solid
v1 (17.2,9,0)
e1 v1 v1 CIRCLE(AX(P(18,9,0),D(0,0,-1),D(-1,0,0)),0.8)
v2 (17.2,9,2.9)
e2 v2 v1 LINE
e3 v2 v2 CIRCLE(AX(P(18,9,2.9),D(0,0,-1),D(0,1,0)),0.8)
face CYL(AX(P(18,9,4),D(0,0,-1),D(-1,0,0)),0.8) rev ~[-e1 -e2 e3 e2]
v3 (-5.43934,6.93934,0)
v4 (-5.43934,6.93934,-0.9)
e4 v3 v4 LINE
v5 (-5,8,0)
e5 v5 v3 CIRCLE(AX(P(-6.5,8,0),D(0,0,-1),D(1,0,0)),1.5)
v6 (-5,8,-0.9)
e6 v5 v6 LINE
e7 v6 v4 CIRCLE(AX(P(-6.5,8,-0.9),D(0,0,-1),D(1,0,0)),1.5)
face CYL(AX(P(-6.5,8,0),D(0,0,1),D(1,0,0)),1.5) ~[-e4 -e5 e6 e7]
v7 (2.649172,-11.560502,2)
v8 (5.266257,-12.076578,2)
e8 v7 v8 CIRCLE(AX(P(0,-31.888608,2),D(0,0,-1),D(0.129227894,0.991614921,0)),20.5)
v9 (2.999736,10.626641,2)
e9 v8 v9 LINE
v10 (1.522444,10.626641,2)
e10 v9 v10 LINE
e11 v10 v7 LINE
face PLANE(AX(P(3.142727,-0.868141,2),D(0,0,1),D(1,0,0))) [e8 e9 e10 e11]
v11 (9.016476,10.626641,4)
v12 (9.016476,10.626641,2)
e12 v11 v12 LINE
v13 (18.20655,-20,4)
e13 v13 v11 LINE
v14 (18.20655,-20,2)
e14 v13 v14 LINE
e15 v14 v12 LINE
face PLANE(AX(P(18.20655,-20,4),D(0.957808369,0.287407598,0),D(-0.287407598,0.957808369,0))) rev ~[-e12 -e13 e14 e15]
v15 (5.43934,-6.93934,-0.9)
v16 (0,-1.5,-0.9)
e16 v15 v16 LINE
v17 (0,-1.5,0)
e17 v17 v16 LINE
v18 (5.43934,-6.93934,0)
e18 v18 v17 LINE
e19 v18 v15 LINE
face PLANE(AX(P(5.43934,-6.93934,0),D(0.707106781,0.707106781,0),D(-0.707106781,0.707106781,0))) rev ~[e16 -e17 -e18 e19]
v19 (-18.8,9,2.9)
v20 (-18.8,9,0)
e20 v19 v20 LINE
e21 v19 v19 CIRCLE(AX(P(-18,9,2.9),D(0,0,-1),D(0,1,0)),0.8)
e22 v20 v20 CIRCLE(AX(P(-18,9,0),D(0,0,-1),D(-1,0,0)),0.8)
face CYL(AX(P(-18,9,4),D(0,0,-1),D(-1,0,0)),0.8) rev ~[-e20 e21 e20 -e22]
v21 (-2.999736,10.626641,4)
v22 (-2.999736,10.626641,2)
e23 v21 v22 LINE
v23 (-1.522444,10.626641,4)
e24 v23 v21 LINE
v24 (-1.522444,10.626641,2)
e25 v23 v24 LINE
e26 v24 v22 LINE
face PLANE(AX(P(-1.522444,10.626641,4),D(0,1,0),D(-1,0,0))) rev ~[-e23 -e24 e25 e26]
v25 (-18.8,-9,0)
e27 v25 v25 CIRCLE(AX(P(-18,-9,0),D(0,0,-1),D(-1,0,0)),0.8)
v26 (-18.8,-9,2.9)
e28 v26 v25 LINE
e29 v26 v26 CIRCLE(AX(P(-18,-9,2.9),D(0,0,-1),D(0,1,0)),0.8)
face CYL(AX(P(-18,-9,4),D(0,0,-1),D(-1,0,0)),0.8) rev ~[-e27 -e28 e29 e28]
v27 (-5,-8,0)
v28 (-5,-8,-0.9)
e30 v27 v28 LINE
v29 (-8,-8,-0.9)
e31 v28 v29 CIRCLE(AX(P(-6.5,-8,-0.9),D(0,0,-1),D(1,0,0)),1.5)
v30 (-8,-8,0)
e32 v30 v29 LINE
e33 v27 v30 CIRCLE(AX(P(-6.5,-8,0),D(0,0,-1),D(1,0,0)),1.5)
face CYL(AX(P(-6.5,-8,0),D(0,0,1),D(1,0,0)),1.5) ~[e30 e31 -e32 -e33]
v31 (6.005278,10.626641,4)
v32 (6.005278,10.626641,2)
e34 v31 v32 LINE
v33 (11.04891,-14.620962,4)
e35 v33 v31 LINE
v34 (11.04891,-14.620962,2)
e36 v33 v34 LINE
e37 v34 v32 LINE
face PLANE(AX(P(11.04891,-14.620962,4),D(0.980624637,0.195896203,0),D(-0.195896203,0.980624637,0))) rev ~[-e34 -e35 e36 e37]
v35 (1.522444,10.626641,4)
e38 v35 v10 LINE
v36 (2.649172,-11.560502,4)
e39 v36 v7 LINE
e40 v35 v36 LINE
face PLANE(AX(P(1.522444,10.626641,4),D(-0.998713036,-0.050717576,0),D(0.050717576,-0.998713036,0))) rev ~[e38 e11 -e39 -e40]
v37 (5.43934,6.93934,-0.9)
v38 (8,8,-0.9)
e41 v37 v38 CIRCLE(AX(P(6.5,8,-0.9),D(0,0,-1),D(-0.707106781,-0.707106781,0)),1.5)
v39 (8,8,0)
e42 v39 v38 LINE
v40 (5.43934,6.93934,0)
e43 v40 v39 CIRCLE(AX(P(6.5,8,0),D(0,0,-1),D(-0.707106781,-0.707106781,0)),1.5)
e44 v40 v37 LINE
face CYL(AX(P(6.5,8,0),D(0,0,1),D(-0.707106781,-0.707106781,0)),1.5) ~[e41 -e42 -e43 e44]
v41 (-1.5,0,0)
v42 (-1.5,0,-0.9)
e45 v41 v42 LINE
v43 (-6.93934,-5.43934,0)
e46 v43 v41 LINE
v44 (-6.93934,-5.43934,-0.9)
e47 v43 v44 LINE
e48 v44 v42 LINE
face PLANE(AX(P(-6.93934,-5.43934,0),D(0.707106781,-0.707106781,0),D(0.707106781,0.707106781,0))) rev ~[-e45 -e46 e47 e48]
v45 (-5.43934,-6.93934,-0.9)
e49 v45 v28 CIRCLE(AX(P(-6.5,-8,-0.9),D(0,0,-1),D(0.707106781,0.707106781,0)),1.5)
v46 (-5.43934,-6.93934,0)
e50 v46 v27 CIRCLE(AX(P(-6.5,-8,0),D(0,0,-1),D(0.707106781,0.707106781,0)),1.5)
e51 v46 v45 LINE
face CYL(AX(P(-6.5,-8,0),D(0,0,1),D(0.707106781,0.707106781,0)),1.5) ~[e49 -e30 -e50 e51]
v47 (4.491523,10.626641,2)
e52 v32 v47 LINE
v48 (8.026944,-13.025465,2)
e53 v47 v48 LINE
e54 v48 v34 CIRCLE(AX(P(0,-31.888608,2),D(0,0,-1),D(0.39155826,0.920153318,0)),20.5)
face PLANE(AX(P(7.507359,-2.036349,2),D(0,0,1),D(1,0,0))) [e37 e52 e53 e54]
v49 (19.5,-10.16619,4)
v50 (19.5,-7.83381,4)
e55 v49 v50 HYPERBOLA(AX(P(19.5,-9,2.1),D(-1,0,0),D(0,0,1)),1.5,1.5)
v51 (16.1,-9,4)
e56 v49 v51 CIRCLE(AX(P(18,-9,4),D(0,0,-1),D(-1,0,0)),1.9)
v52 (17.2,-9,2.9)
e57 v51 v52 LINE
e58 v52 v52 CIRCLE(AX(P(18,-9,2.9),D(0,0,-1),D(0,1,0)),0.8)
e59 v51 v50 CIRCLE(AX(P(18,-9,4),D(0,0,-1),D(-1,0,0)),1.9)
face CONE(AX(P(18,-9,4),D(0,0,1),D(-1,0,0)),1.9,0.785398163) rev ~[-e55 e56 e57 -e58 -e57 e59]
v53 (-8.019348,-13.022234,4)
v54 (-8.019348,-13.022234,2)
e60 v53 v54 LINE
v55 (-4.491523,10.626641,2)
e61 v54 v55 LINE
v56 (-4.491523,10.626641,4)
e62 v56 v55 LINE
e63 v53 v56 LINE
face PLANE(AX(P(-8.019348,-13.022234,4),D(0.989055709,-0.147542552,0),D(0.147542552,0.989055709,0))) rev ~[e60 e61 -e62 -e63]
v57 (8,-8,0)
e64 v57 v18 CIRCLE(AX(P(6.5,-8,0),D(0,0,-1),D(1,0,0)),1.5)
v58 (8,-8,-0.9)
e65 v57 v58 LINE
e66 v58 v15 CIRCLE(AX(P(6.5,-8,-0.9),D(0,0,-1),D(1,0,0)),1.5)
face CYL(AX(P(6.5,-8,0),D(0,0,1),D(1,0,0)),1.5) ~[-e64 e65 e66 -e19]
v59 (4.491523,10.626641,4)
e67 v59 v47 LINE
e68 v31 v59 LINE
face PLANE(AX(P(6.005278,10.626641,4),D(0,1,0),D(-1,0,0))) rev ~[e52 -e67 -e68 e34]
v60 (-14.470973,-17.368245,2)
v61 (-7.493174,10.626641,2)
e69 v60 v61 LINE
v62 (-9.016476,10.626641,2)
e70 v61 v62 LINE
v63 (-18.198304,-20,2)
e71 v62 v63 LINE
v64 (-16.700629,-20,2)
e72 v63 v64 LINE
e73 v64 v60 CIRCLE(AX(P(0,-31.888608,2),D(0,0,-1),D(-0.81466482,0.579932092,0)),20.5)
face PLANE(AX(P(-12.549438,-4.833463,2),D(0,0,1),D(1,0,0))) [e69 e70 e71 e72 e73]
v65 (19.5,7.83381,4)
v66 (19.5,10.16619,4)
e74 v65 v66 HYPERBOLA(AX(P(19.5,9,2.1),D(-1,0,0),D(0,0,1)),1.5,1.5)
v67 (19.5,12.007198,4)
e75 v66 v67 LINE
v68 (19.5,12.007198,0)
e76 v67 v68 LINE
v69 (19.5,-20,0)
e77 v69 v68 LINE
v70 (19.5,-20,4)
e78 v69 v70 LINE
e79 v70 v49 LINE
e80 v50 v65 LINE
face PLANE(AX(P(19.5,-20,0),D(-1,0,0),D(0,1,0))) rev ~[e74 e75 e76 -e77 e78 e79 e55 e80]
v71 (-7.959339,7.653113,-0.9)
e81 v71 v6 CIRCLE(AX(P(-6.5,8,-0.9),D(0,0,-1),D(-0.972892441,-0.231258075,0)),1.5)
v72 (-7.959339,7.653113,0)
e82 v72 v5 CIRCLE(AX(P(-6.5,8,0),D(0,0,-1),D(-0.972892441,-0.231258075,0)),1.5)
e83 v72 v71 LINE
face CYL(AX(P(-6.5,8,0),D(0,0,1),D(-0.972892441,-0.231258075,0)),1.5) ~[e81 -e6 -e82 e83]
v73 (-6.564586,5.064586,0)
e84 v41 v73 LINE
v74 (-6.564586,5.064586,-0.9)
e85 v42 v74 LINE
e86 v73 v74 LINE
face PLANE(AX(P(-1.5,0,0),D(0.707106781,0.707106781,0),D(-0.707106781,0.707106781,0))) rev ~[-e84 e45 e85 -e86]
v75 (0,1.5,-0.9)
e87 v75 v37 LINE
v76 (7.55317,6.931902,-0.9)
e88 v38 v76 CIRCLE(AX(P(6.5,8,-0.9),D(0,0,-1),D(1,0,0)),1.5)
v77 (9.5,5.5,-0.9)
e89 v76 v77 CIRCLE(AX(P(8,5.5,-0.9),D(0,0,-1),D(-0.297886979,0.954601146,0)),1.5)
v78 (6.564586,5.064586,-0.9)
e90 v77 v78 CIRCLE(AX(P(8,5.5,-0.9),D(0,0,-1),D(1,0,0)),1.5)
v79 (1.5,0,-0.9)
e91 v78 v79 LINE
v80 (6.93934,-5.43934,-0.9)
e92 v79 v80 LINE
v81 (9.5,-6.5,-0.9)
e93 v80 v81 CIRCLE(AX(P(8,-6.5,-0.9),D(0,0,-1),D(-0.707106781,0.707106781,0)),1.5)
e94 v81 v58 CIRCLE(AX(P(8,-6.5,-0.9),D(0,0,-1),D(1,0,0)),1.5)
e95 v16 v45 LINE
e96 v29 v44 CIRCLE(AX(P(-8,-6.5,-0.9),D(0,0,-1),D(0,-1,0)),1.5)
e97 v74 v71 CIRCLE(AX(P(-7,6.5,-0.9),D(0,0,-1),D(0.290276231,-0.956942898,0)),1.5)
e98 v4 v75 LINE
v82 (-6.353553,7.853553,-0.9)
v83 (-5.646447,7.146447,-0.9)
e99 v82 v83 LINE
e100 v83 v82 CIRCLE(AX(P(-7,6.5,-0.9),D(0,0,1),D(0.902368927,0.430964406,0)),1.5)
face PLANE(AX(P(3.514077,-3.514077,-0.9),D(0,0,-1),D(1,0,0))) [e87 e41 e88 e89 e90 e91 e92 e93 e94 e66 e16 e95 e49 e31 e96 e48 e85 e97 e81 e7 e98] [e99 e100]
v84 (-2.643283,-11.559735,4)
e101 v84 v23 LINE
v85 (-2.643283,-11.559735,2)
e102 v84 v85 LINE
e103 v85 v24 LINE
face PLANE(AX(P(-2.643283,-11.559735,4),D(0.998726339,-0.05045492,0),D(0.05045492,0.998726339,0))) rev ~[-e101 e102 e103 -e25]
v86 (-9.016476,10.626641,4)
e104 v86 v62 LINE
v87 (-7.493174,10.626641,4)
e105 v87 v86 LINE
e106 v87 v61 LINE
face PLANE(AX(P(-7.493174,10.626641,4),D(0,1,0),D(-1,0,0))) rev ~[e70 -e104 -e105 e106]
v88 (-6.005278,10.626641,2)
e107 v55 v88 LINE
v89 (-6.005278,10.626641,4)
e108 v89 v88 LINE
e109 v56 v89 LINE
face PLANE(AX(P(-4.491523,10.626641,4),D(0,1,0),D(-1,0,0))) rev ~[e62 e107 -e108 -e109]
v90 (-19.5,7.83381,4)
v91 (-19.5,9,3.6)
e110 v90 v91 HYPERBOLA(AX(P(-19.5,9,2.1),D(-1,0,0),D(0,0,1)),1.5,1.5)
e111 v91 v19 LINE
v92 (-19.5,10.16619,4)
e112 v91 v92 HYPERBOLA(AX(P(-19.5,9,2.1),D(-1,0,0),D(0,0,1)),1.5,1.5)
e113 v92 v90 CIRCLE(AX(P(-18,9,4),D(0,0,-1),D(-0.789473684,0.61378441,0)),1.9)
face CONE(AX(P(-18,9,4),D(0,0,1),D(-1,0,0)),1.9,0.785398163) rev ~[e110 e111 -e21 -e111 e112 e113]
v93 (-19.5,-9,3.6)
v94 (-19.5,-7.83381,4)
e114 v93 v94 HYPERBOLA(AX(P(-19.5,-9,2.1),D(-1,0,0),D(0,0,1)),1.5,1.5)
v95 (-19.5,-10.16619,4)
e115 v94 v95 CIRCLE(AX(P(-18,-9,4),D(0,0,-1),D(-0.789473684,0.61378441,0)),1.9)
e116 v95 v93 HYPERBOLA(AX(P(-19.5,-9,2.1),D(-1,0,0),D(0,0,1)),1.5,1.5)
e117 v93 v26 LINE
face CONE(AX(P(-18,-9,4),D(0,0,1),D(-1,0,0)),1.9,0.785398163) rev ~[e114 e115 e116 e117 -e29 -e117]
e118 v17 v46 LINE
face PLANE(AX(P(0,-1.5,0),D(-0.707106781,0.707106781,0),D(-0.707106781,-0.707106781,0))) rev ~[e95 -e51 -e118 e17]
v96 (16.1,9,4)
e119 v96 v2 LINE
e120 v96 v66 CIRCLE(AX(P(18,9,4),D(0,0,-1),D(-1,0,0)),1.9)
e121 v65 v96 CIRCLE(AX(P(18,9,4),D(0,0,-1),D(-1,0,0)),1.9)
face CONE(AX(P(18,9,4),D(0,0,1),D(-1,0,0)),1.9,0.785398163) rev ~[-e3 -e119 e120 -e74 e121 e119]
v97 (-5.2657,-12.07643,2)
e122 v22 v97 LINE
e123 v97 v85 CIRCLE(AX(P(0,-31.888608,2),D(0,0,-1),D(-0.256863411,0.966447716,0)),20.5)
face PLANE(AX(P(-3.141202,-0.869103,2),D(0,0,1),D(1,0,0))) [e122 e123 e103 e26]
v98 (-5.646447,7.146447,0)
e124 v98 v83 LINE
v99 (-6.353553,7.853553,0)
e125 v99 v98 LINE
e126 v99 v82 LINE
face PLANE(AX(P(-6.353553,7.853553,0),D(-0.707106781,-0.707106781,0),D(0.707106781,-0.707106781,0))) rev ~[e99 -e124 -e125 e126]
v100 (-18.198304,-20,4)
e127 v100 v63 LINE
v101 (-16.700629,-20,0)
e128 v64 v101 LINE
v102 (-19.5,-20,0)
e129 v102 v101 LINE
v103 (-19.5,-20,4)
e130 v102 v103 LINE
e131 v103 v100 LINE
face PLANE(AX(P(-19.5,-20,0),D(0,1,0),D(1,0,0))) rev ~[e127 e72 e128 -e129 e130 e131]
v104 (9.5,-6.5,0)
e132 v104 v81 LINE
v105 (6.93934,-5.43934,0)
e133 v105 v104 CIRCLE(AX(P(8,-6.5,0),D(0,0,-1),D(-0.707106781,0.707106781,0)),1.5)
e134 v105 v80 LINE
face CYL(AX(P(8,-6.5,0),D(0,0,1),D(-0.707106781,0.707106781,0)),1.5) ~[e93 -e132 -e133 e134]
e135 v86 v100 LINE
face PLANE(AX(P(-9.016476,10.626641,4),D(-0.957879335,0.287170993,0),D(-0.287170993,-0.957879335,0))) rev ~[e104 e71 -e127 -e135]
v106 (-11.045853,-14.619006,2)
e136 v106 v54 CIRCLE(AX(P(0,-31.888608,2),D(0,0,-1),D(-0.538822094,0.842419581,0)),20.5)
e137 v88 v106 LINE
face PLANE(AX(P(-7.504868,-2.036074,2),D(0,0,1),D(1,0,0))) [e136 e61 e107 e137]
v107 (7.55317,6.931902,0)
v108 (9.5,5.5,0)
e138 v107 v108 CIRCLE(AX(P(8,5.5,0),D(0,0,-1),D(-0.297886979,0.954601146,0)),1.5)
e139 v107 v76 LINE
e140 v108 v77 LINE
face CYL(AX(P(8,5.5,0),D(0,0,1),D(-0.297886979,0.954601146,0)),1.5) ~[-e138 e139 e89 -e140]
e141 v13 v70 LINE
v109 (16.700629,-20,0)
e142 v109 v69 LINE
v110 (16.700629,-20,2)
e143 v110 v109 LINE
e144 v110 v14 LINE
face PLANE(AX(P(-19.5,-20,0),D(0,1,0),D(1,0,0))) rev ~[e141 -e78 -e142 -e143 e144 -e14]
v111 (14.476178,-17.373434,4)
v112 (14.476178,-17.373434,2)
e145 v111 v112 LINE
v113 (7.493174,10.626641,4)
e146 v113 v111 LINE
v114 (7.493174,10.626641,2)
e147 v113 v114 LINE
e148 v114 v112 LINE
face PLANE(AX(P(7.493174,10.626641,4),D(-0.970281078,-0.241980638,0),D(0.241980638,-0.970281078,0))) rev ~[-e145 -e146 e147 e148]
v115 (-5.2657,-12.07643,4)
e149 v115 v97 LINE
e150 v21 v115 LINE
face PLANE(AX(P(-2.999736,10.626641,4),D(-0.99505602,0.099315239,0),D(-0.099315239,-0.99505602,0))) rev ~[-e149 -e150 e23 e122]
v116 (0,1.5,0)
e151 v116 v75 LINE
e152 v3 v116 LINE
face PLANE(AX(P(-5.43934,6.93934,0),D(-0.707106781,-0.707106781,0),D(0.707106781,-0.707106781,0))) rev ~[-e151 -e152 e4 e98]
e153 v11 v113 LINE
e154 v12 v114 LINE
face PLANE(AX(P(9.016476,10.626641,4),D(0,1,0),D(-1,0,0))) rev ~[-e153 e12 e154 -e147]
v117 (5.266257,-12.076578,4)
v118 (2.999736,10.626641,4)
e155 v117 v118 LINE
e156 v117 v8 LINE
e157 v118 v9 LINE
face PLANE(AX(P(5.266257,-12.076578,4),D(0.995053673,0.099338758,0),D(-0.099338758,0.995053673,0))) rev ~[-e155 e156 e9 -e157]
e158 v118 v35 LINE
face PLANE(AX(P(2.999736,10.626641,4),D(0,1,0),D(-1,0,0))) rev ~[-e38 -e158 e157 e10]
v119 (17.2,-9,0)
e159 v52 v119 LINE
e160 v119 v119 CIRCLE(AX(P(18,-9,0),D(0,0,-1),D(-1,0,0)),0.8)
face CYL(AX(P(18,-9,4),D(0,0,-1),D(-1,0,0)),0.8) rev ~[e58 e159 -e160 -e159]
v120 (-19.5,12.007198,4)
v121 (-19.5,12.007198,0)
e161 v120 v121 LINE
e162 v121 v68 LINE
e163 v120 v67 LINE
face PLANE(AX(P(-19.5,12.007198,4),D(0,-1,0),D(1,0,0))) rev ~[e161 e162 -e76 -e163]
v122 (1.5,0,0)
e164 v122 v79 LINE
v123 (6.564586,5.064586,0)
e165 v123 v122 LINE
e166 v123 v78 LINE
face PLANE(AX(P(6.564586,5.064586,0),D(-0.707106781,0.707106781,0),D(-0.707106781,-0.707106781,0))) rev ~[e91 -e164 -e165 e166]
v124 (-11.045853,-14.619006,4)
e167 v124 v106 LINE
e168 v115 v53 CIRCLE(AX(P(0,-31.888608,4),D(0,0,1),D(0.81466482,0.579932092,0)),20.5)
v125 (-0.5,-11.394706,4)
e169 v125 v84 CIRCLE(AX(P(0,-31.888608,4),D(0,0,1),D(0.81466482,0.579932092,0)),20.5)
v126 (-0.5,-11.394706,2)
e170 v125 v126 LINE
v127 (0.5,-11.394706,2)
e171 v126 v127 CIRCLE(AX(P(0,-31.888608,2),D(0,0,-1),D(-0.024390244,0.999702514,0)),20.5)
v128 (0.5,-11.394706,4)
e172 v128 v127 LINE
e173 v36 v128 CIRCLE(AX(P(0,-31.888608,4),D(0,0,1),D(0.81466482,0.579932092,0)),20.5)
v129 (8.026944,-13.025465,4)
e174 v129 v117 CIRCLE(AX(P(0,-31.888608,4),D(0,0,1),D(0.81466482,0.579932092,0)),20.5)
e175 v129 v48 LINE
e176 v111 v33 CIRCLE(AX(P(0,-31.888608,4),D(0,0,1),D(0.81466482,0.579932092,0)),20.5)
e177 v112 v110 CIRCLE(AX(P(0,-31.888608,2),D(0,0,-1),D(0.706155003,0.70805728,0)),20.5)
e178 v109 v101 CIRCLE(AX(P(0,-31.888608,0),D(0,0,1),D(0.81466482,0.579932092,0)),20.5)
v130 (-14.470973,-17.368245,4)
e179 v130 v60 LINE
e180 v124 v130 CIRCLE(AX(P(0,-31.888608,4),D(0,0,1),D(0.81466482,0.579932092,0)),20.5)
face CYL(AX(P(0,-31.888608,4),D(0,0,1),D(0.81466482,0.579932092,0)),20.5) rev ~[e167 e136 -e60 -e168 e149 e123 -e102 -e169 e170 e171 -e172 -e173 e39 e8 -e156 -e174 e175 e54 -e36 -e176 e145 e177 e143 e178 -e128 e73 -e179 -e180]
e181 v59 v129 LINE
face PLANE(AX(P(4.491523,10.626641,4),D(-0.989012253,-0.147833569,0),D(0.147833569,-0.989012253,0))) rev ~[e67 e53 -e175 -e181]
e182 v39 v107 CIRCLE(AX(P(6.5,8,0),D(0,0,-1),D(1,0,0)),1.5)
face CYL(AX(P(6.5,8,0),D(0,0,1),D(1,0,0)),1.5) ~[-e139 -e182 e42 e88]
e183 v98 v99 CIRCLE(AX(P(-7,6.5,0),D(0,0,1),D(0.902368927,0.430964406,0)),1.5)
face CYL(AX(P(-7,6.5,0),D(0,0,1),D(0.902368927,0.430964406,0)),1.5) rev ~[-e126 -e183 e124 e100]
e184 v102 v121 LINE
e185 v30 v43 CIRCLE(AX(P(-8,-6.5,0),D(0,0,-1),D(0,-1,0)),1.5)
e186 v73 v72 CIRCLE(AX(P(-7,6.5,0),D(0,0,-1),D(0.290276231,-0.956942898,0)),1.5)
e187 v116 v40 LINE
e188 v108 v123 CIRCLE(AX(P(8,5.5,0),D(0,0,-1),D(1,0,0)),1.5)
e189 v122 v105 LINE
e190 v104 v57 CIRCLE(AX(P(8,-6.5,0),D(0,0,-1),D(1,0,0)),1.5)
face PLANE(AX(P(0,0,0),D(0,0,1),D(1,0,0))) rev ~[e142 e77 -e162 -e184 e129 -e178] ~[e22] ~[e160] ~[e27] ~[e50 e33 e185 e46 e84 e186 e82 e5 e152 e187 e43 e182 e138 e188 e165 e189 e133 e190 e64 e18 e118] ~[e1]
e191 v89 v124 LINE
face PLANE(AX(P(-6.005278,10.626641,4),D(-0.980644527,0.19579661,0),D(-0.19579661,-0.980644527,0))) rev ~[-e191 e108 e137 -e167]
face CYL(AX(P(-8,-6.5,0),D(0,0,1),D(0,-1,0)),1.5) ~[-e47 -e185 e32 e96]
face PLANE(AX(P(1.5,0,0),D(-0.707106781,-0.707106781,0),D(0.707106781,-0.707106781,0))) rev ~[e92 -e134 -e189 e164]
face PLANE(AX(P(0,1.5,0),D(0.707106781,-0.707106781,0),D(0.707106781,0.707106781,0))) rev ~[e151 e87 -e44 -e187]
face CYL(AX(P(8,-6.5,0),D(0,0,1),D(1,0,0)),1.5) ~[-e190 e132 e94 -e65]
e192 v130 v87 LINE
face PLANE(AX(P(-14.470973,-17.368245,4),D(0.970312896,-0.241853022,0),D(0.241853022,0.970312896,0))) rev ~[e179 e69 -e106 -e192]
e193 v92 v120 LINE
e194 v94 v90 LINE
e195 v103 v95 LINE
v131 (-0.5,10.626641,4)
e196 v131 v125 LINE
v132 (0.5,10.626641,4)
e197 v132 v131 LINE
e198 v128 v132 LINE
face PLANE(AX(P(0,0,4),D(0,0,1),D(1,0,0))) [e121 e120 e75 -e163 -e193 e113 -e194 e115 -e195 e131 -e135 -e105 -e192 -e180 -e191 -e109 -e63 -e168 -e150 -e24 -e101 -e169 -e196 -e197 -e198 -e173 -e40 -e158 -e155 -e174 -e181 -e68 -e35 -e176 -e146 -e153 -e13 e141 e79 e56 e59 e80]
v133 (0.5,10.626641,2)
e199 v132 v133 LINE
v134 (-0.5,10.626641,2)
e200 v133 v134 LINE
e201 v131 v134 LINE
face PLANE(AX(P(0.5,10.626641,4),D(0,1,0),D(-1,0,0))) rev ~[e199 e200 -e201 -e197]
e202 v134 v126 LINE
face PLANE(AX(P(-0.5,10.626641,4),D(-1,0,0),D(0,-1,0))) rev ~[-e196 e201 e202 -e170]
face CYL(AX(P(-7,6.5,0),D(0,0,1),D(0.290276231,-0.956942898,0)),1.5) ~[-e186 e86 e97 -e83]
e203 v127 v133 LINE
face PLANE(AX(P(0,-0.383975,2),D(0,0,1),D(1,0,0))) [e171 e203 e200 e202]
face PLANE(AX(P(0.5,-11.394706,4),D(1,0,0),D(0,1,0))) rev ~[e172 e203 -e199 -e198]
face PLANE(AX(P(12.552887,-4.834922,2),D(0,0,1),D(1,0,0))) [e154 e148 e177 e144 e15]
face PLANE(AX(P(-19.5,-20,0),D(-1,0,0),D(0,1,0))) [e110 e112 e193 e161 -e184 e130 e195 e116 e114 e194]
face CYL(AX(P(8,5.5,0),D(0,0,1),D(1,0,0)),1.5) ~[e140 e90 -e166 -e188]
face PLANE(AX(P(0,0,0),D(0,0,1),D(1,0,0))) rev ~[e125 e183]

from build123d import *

# Parameters (mm, degrees)
F0_W           = 39
F0_H           = 40
F1_DEPTH       = 4
F4_DEPTH       = 25
F5_W           = 39
F5_H           = 7.9928017035
F6_DEPTH       = 25
F9_D           = 1.6
F9_CSINK_D     = 3.8
F9_CSINK_ANGLE = 90
F10_DEPTH      = 2
F12_DEPTH      = 0.9
F13_DEPTH      = 2


with BuildPart() as f1:
    # F0 (on Top) → F1 (new body)
    with BuildSketch(Plane.XY):
        Rectangle(F0_W, F0_H)
    extrude(amount=F1_DEPTH)

    # F3 (on face) → F4 (cut)
    with BuildSketch(Plane.XY.offset(4)):
        with BuildLine():
            Line((-16.7006288041, -20), (16.7006288041, -20))
            ThreePointArc((16.7006288041, -20), (0, -11.3886078894), (-16.7006288041, -20))
        make_face()
        with BuildLine():
            ThreePointArc((-16.7006288041, -20), (-6.2404771258, -51.4156774402), (20.5, -31.8886078894))
            ThreePointArc((20.5, -31.8886078894), (19.5270695508, -25.6481307636), (16.7006288041, -20))
            Line((16.7006288041, -20), (-16.7006288041, -20))
        make_face()
    extrude(amount=-F4_DEPTH, mode=Mode.SUBTRACT)

    # F5 (on face) → F6 (cut)
    with BuildSketch(Plane.XY.offset(4)):
        with Locations((0, 16.0035991482)):
            Rectangle(F5_W, F5_H)
    extrude(amount=-F6_DEPTH, mode=Mode.SUBTRACT)

    # F9 (through all)
    with Locations(Plane.XY.offset(4)):
        with Locations((18, 9), (18, -9), (-18, 9), (-18, -9)):
            CounterSinkHole(F9_D / 2, F9_CSINK_D / 2, counter_sink_angle=F9_CSINK_ANGLE)

    # F7 (on face) → F10 (cut)
    with BuildSketch(Plane.XY.offset(4)):
        with BuildLine():
            Line((0.5, 10.6266411021), (-0.5, 10.6266411021))
            Line((-0.5, 10.6266411021), (-0.5, -11.3947063575))
            ThreePointArc((-0.5, -11.3947063575), (0, -11.3886078894), (0.5, -11.3947063575))
            Line((0.5, -11.3947063575), (0.5, 10.6266411021))
        make_face()
        with BuildLine():
            ThreePointArc((-5.2656999319, -12.0764297096), (-3.9629214288, -11.7752975267), (-2.6432830651, -11.5597354505))
            Line((-2.6432830651, -11.5597354505), (-1.522443646, 10.6266411021))
            Line((-1.522443646, 10.6266411021), (-2.021334134, 10.6266411021))
            Line((-2.021334134, 10.6266411021), (-2.4928057101, 10.6266411021))
            Line((-2.4928057101, 10.6266411021), (-2.9997361505, 10.6266411021))
            Line((-2.9997361505, 10.6266411021), (-5.2656999319, -12.0764297096))
        make_face()
        with BuildLine():
            ThreePointArc((-11.0458529252, -14.6190064709), (-9.5659756043, -13.7573610835), (-8.0193476987, -13.0222340331))
            Line((-8.0193476987, -13.0222340331), (-4.491522759, 10.6266411021))
            Line((-4.491522759, 10.6266411021), (-4.9930326641, 10.6266411021))
            Line((-4.9930326641, 10.6266411021), (-5.5073648691, 10.6266411021))
            Line((-5.5073648691, 10.6266411021), (-6.005277995, 10.6266411021))
            Line((-6.005277995, 10.6266411021), (-11.0458529252, -14.6190064709))
        make_face()
        with BuildLine():
            ThreePointArc((-16.7006288041, -20), (-15.6412505167, -18.6371444882), (-14.4709725994, -17.3682445321))
            Line((-14.4709725994, -17.3682445321), (-7.4931742786, 10.6266411021))
            Line((-7.4931742786, 10.6266411021), (-7.993305102, 10.6266411021))
            Line((-7.993305102, 10.6266411021), (-8.507637307, 10.6266411021))
            Line((-8.507637307, 10.6266411021), (-9.0164762619, 10.6266411021))
            Line((-9.0164762619, 10.6266411021), (-18.1983038783, -20))
            Line((-18.1983038783, -20), (-17.6982320845, -20))
            Line((-17.6982320845, -20), (-16.7006288041, -20))
        make_face()
    extrude(amount=-F10_DEPTH, mode=Mode.SUBTRACT)

    # F11 (on face) → F12 (join)
    with BuildSketch(Plane(origin=(0, 0, 0), x_dir=(1, 0, 0), z_dir=(0, 0, -1))):
        with BuildLine():
            Line((1.5, 0), (6.9393398282, 5.4393398282))
            ThreePointArc((6.9393398282, 5.4393398282), (6.6141807012, 5.9259748515), (6.5, 6.5))
            ThreePointArc((6.5, 6.5), (5.9259748515, 6.6141807012), (5.4393398282, 6.9393398282))
            Line((5.4393398282, 6.9393398282), (0, 1.5))
            Line((0, 1.5), (1.5, 0))
        make_face()
        with BuildLine():
            ThreePointArc((6.5, 6.5), (6.6141807012, 5.9259748515), (6.9393398282, 5.4393398282))
            ThreePointArc((6.9393398282, 5.4393398282), (8.5740251485, 5.1141807012), (9.5, 6.5))
            ThreePointArc((9.5, 6.5), (9.0606601718, 7.5606601718), (8, 8))
            ThreePointArc((8, 8), (7.5606601718, 6.9393398282), (6.5, 6.5))
        make_face()
        with BuildLine():
            Line((6.5645856533, -5.0645856533), (1.5, 0))
            Line((1.5, 0), (0, -1.5))
            Line((0, -1.5), (5.4393398282, -6.9393398282))
            ThreePointArc((5.4393398282, -6.9393398282), (6.1413193654, -6.5435151211), (6.9468304687, -6.5680982812))
            ThreePointArc((6.9468304687, -6.5680982812), (6.5462462433, -5.8695943925), (6.5645856533, -5.0645856533))
        make_face()
        Polygon((0, -1.5), (1.5, 0), (0, 1.5), (-1.5, 0), align=None)
        with BuildLine():
            ThreePointArc((5.4393398282, 6.9393398282), (5.9259748515, 6.6141807012), (6.5, 6.5))
            ThreePointArc((6.5, 6.5), (6.9393398282, 7.5606601718), (8, 8))
            ThreePointArc((8, 8), (5.9259748515, 9.3858192988), (5.4393398282, 6.9393398282))
        make_face()
        with BuildLine():
            ThreePointArc((8, 8), (6.9393398282, 7.5606601718), (6.5, 6.5))
            ThreePointArc((6.5, 6.5), (7.5606601718, 6.9393398282), (8, 8))
        make_face()
        with BuildLine():
            Line((-5.4393398282, -6.9393398282), (0, -1.5))
            Line((0, -1.5), (-1.5, 0))
            Line((-1.5, 0), (-6.5645856533, -5.0645856533))
            ThreePointArc((-6.5645856533, -5.0645856533), (-5.7951926461, -5.6064457263), (-5.5, -6.5))
            ThreePointArc((-5.5, -6.5), (-5.5102000145, -6.6746310491), (-5.5406613378, -6.8468871126))
            ThreePointArc((-5.5406613378, -6.8468871126), (-5.4889432763, -6.8919547385), (-5.4393398282, -6.9393398282))
        make_face()
        with BuildLine():
            ThreePointArc((9.5, -5.5), (8.2200891637, -4.0162342638), (6.5645856533, -5.0645856533))
            ThreePointArc((6.5645856533, -5.0645856533), (6.5462462433, -5.8695943925), (6.9468304687, -6.5680982812))
            ThreePointArc((6.9468304687, -6.5680982812), (7.2717436331, -6.7137606114), (7.5531695313, -6.9319017188))
            ThreePointArc((7.5531695313, -6.9319017188), (8.8887503297, -6.7083554326), (9.5, -5.5))
        make_face()
        with BuildLine():
            Line((-1.5, 0), (0, 1.5))
            Line((0, 1.5), (-5.4393398282, 6.9393398282))
            ThreePointArc((-5.4393398282, 6.9393398282), (-5.9259748515, 6.6141807012), (-6.5, 6.5))
            ThreePointArc((-6.5, 6.5), (-6.6141807012, 5.9259748515), (-6.9393398282, 5.4393398282))
            Line((-6.9393398282, 5.4393398282), (-1.5, 0))
        make_face()
        with BuildLine():
            ThreePointArc((-5, -8), (-5.1141807012, -7.4259748515), (-5.4393398282, -6.9393398282))
            Line((-5.4393398282, -6.9393398282), (-5.6464466094, -7.1464466094))
            ThreePointArc((-5.6464466094, -7.1464466094), (-5.9393398282, -7.5606601718), (-6.3535533906, -7.8535533906))
            ThreePointArc((-6.3535533906, -7.8535533906), (-7.185794128, -7.9884490391), (-7.9593386622, -7.6531128874))
            ThreePointArc((-7.9593386622, -7.6531128874), (-6.6746310491, -9.4897999855), (-5, -8))
        make_face()
        with BuildLine():
            Line((-5.6464466094, -7.1464466094), (-5.4393398282, -6.9393398282))
            ThreePointArc((-5.4393398282, -6.9393398282), (-5.4889432763, -6.8919547385), (-5.5406613378, -6.8468871126))
            ThreePointArc((-5.5406613378, -6.8468871126), (-5.585601047, -6.9994753265), (-5.6464466094, -7.1464466094))
        make_face()
        with BuildLine():
            ThreePointArc((6.9468304687, -6.5680982812), (6.1413193654, -6.5435151211), (5.4393398282, -6.9393398282))
            ThreePointArc((5.4393398282, -6.9393398282), (5.9259748515, -9.3858192988), (8, -8))
            ThreePointArc((8, -8), (7.8837908615, -7.421102037), (7.5531695313, -6.9319017188))
            ThreePointArc((7.5531695313, -6.9319017188), (7.2282563669, -6.7862393886), (6.9468304687, -6.5680982812))
        make_face()
        with BuildLine():
            ThreePointArc((7.5531695313, -6.9319017188), (7.2717436331, -6.7137606114), (6.9468304687, -6.5680982812))
            ThreePointArc((6.9468304687, -6.5680982812), (7.2282563669, -6.7862393886), (7.5531695313, -6.9319017188))
        make_face()
        with BuildLine():
            ThreePointArc((-6.5, 6.5), (-5.9259748515, 6.6141807012), (-5.4393398282, 6.9393398282))
            ThreePointArc((-5.4393398282, 6.9393398282), (-5.1141807012, 7.4259748515), (-5, 8))
            ThreePointArc((-5, 8), (-6.5, 9.5), (-8, 8))
            ThreePointArc((-8, 8), (-6.9393398282, 7.5606601718), (-6.5, 6.5))
        make_face()
        with BuildLine():
            Line((-6.3535533906, -7.8535533906), (-5.6464466094, -7.1464466094))
            ThreePointArc((-5.6464466094, -7.1464466094), (-5.585601047, -6.9994753265), (-5.5406613378, -6.8468871126))
            ThreePointArc((-5.5406613378, -6.8468871126), (-6.974341649, -6.5769750529), (-7.9593386622, -7.6531128874))
            ThreePointArc((-7.9593386622, -7.6531128874), (-7.185794128, -7.9884490391), (-6.3535533906, -7.8535533906))
        make_face()
        with BuildLine():
            ThreePointArc((-7.9593386622, -7.6531128874), (-6.974341649, -6.5769750529), (-5.5406613378, -6.8468871126))
            ThreePointArc((-5.5406613378, -6.8468871126), (-5.5102000145, -6.6746310491), (-5.5, -6.5))
            ThreePointArc((-5.5, -6.5), (-5.7951926461, -5.6064457263), (-6.5645856533, -5.0645856533))
            ThreePointArc((-6.5645856533, -5.0645856533), (-8.3205084182, -5.7884822437), (-7.9593386622, -7.6531128874))
        make_face()
        with BuildLine():
            ThreePointArc((-8, 8), (-9.3858192988, 5.9259748515), (-6.9393398282, 5.4393398282))
            ThreePointArc((-6.9393398282, 5.4393398282), (-6.6141807012, 5.9259748515), (-6.5, 6.5))
            ThreePointArc((-6.5, 6.5), (-7.5606601718, 6.9393398282), (-8, 8))
        make_face()
        with BuildLine():
            ThreePointArc((-8, 8), (-7.5606601718, 6.9393398282), (-6.5, 6.5))
            ThreePointArc((-6.5, 6.5), (-6.9393398282, 7.5606601718), (-8, 8))
        make_face()
    extrude(amount=F12_DEPTH)

    # F7 (on face) → F13 (cut)
    with BuildSketch(Plane.XY.offset(4)):
        with BuildLine():
            Line((0.5, 10.6266411021), (-0.5, 10.6266411021))
            Line((-0.5, 10.6266411021), (-0.5, -11.3947063575))
            ThreePointArc((-0.5, -11.3947063575), (0, -11.3886078894), (0.5, -11.3947063575))
            Line((0.5, -11.3947063575), (0.5, 10.6266411021))
        make_face()
        with BuildLine():
            Line((1.522443646, 10.6266411021), (2.6491718308, -11.5605020108))
            ThreePointArc((2.6491718308, -11.5605020108), (3.9661171857, -11.7759274497), (5.2662566492, -12.0765776829))
            Line((5.2662566492, -12.0765776829), (2.9997361505, 10.6266411021))
            Line((2.9997361505, 10.6266411021), (2.498709131, 10.6266411021))
            Line((2.498709131, 10.6266411021), (2.0272377878, 10.6266411021))
            Line((2.0272377878, 10.6266411021), (1.522443646, 10.6266411021))
        make_face()
        with BuildLine():
            Line((4.491522759, 10.6266411021), (8.0269443273, -13.0254648648))
            ThreePointArc((8.0269443273, -13.0254648648), (9.5712306064, -13.7601345759), (11.048909782, -14.620962056))
            Line((11.048909782, -14.620962056), (6.005277995, 10.6266411021))
            Line((6.005277995, 10.6266411021), (5.4984204471, 10.6266411021))
            Line((5.4984204471, 10.6266411021), (4.9972091801, 10.6266411021))
            Line((4.9972091801, 10.6266411021), (4.491522759, 10.6266411021))
        make_face()
        with BuildLine():
            ThreePointArc((-16.7006288041, -20), (-15.6412505167, -18.6371444882), (-14.4709725994, -17.3682445321))
            Line((-14.4709725994, -17.3682445321), (-7.4931742786, 10.6266411021))
            Line((-7.4931742786, 10.6266411021), (-7.993305102, 10.6266411021))
            Line((-7.993305102, 10.6266411021), (-8.507637307, 10.6266411021))
            Line((-8.507637307, 10.6266411021), (-9.0164762619, 10.6266411021))
            Line((-9.0164762619, 10.6266411021), (-18.1983038783, -20))
            Line((-18.1983038783, -20), (-17.6982320845, -20))
            Line((-17.6982320845, -20), (-16.7006288041, -20))
        make_face()
        with BuildLine():
            Line((7.4931742786, 10.6266411021), (14.4761775715, -17.3734336598))
            ThreePointArc((14.4761775715, -17.3734336598), (15.6436257508, -18.6399485848), (16.7006288041, -20))
            Line((16.7006288041, -20), (17.7064798772, -20))
            Line((17.7064798772, -20), (18.2065498084, -20))
            Line((18.2065498084, -20), (9.0164762619, 10.6266411021))
            Line((9.0164762619, 10.6266411021), (8.5177253932, 10.6266411021))
            Line((8.5177253932, 10.6266411021), (7.9971281812, 10.6266411021))
            Line((7.9971281812, 10.6266411021), (7.4931742786, 10.6266411021))
        make_face()
    extrude(amount=-F13_DEPTH, mode=Mode.SUBTRACT)


solid = f1.part
